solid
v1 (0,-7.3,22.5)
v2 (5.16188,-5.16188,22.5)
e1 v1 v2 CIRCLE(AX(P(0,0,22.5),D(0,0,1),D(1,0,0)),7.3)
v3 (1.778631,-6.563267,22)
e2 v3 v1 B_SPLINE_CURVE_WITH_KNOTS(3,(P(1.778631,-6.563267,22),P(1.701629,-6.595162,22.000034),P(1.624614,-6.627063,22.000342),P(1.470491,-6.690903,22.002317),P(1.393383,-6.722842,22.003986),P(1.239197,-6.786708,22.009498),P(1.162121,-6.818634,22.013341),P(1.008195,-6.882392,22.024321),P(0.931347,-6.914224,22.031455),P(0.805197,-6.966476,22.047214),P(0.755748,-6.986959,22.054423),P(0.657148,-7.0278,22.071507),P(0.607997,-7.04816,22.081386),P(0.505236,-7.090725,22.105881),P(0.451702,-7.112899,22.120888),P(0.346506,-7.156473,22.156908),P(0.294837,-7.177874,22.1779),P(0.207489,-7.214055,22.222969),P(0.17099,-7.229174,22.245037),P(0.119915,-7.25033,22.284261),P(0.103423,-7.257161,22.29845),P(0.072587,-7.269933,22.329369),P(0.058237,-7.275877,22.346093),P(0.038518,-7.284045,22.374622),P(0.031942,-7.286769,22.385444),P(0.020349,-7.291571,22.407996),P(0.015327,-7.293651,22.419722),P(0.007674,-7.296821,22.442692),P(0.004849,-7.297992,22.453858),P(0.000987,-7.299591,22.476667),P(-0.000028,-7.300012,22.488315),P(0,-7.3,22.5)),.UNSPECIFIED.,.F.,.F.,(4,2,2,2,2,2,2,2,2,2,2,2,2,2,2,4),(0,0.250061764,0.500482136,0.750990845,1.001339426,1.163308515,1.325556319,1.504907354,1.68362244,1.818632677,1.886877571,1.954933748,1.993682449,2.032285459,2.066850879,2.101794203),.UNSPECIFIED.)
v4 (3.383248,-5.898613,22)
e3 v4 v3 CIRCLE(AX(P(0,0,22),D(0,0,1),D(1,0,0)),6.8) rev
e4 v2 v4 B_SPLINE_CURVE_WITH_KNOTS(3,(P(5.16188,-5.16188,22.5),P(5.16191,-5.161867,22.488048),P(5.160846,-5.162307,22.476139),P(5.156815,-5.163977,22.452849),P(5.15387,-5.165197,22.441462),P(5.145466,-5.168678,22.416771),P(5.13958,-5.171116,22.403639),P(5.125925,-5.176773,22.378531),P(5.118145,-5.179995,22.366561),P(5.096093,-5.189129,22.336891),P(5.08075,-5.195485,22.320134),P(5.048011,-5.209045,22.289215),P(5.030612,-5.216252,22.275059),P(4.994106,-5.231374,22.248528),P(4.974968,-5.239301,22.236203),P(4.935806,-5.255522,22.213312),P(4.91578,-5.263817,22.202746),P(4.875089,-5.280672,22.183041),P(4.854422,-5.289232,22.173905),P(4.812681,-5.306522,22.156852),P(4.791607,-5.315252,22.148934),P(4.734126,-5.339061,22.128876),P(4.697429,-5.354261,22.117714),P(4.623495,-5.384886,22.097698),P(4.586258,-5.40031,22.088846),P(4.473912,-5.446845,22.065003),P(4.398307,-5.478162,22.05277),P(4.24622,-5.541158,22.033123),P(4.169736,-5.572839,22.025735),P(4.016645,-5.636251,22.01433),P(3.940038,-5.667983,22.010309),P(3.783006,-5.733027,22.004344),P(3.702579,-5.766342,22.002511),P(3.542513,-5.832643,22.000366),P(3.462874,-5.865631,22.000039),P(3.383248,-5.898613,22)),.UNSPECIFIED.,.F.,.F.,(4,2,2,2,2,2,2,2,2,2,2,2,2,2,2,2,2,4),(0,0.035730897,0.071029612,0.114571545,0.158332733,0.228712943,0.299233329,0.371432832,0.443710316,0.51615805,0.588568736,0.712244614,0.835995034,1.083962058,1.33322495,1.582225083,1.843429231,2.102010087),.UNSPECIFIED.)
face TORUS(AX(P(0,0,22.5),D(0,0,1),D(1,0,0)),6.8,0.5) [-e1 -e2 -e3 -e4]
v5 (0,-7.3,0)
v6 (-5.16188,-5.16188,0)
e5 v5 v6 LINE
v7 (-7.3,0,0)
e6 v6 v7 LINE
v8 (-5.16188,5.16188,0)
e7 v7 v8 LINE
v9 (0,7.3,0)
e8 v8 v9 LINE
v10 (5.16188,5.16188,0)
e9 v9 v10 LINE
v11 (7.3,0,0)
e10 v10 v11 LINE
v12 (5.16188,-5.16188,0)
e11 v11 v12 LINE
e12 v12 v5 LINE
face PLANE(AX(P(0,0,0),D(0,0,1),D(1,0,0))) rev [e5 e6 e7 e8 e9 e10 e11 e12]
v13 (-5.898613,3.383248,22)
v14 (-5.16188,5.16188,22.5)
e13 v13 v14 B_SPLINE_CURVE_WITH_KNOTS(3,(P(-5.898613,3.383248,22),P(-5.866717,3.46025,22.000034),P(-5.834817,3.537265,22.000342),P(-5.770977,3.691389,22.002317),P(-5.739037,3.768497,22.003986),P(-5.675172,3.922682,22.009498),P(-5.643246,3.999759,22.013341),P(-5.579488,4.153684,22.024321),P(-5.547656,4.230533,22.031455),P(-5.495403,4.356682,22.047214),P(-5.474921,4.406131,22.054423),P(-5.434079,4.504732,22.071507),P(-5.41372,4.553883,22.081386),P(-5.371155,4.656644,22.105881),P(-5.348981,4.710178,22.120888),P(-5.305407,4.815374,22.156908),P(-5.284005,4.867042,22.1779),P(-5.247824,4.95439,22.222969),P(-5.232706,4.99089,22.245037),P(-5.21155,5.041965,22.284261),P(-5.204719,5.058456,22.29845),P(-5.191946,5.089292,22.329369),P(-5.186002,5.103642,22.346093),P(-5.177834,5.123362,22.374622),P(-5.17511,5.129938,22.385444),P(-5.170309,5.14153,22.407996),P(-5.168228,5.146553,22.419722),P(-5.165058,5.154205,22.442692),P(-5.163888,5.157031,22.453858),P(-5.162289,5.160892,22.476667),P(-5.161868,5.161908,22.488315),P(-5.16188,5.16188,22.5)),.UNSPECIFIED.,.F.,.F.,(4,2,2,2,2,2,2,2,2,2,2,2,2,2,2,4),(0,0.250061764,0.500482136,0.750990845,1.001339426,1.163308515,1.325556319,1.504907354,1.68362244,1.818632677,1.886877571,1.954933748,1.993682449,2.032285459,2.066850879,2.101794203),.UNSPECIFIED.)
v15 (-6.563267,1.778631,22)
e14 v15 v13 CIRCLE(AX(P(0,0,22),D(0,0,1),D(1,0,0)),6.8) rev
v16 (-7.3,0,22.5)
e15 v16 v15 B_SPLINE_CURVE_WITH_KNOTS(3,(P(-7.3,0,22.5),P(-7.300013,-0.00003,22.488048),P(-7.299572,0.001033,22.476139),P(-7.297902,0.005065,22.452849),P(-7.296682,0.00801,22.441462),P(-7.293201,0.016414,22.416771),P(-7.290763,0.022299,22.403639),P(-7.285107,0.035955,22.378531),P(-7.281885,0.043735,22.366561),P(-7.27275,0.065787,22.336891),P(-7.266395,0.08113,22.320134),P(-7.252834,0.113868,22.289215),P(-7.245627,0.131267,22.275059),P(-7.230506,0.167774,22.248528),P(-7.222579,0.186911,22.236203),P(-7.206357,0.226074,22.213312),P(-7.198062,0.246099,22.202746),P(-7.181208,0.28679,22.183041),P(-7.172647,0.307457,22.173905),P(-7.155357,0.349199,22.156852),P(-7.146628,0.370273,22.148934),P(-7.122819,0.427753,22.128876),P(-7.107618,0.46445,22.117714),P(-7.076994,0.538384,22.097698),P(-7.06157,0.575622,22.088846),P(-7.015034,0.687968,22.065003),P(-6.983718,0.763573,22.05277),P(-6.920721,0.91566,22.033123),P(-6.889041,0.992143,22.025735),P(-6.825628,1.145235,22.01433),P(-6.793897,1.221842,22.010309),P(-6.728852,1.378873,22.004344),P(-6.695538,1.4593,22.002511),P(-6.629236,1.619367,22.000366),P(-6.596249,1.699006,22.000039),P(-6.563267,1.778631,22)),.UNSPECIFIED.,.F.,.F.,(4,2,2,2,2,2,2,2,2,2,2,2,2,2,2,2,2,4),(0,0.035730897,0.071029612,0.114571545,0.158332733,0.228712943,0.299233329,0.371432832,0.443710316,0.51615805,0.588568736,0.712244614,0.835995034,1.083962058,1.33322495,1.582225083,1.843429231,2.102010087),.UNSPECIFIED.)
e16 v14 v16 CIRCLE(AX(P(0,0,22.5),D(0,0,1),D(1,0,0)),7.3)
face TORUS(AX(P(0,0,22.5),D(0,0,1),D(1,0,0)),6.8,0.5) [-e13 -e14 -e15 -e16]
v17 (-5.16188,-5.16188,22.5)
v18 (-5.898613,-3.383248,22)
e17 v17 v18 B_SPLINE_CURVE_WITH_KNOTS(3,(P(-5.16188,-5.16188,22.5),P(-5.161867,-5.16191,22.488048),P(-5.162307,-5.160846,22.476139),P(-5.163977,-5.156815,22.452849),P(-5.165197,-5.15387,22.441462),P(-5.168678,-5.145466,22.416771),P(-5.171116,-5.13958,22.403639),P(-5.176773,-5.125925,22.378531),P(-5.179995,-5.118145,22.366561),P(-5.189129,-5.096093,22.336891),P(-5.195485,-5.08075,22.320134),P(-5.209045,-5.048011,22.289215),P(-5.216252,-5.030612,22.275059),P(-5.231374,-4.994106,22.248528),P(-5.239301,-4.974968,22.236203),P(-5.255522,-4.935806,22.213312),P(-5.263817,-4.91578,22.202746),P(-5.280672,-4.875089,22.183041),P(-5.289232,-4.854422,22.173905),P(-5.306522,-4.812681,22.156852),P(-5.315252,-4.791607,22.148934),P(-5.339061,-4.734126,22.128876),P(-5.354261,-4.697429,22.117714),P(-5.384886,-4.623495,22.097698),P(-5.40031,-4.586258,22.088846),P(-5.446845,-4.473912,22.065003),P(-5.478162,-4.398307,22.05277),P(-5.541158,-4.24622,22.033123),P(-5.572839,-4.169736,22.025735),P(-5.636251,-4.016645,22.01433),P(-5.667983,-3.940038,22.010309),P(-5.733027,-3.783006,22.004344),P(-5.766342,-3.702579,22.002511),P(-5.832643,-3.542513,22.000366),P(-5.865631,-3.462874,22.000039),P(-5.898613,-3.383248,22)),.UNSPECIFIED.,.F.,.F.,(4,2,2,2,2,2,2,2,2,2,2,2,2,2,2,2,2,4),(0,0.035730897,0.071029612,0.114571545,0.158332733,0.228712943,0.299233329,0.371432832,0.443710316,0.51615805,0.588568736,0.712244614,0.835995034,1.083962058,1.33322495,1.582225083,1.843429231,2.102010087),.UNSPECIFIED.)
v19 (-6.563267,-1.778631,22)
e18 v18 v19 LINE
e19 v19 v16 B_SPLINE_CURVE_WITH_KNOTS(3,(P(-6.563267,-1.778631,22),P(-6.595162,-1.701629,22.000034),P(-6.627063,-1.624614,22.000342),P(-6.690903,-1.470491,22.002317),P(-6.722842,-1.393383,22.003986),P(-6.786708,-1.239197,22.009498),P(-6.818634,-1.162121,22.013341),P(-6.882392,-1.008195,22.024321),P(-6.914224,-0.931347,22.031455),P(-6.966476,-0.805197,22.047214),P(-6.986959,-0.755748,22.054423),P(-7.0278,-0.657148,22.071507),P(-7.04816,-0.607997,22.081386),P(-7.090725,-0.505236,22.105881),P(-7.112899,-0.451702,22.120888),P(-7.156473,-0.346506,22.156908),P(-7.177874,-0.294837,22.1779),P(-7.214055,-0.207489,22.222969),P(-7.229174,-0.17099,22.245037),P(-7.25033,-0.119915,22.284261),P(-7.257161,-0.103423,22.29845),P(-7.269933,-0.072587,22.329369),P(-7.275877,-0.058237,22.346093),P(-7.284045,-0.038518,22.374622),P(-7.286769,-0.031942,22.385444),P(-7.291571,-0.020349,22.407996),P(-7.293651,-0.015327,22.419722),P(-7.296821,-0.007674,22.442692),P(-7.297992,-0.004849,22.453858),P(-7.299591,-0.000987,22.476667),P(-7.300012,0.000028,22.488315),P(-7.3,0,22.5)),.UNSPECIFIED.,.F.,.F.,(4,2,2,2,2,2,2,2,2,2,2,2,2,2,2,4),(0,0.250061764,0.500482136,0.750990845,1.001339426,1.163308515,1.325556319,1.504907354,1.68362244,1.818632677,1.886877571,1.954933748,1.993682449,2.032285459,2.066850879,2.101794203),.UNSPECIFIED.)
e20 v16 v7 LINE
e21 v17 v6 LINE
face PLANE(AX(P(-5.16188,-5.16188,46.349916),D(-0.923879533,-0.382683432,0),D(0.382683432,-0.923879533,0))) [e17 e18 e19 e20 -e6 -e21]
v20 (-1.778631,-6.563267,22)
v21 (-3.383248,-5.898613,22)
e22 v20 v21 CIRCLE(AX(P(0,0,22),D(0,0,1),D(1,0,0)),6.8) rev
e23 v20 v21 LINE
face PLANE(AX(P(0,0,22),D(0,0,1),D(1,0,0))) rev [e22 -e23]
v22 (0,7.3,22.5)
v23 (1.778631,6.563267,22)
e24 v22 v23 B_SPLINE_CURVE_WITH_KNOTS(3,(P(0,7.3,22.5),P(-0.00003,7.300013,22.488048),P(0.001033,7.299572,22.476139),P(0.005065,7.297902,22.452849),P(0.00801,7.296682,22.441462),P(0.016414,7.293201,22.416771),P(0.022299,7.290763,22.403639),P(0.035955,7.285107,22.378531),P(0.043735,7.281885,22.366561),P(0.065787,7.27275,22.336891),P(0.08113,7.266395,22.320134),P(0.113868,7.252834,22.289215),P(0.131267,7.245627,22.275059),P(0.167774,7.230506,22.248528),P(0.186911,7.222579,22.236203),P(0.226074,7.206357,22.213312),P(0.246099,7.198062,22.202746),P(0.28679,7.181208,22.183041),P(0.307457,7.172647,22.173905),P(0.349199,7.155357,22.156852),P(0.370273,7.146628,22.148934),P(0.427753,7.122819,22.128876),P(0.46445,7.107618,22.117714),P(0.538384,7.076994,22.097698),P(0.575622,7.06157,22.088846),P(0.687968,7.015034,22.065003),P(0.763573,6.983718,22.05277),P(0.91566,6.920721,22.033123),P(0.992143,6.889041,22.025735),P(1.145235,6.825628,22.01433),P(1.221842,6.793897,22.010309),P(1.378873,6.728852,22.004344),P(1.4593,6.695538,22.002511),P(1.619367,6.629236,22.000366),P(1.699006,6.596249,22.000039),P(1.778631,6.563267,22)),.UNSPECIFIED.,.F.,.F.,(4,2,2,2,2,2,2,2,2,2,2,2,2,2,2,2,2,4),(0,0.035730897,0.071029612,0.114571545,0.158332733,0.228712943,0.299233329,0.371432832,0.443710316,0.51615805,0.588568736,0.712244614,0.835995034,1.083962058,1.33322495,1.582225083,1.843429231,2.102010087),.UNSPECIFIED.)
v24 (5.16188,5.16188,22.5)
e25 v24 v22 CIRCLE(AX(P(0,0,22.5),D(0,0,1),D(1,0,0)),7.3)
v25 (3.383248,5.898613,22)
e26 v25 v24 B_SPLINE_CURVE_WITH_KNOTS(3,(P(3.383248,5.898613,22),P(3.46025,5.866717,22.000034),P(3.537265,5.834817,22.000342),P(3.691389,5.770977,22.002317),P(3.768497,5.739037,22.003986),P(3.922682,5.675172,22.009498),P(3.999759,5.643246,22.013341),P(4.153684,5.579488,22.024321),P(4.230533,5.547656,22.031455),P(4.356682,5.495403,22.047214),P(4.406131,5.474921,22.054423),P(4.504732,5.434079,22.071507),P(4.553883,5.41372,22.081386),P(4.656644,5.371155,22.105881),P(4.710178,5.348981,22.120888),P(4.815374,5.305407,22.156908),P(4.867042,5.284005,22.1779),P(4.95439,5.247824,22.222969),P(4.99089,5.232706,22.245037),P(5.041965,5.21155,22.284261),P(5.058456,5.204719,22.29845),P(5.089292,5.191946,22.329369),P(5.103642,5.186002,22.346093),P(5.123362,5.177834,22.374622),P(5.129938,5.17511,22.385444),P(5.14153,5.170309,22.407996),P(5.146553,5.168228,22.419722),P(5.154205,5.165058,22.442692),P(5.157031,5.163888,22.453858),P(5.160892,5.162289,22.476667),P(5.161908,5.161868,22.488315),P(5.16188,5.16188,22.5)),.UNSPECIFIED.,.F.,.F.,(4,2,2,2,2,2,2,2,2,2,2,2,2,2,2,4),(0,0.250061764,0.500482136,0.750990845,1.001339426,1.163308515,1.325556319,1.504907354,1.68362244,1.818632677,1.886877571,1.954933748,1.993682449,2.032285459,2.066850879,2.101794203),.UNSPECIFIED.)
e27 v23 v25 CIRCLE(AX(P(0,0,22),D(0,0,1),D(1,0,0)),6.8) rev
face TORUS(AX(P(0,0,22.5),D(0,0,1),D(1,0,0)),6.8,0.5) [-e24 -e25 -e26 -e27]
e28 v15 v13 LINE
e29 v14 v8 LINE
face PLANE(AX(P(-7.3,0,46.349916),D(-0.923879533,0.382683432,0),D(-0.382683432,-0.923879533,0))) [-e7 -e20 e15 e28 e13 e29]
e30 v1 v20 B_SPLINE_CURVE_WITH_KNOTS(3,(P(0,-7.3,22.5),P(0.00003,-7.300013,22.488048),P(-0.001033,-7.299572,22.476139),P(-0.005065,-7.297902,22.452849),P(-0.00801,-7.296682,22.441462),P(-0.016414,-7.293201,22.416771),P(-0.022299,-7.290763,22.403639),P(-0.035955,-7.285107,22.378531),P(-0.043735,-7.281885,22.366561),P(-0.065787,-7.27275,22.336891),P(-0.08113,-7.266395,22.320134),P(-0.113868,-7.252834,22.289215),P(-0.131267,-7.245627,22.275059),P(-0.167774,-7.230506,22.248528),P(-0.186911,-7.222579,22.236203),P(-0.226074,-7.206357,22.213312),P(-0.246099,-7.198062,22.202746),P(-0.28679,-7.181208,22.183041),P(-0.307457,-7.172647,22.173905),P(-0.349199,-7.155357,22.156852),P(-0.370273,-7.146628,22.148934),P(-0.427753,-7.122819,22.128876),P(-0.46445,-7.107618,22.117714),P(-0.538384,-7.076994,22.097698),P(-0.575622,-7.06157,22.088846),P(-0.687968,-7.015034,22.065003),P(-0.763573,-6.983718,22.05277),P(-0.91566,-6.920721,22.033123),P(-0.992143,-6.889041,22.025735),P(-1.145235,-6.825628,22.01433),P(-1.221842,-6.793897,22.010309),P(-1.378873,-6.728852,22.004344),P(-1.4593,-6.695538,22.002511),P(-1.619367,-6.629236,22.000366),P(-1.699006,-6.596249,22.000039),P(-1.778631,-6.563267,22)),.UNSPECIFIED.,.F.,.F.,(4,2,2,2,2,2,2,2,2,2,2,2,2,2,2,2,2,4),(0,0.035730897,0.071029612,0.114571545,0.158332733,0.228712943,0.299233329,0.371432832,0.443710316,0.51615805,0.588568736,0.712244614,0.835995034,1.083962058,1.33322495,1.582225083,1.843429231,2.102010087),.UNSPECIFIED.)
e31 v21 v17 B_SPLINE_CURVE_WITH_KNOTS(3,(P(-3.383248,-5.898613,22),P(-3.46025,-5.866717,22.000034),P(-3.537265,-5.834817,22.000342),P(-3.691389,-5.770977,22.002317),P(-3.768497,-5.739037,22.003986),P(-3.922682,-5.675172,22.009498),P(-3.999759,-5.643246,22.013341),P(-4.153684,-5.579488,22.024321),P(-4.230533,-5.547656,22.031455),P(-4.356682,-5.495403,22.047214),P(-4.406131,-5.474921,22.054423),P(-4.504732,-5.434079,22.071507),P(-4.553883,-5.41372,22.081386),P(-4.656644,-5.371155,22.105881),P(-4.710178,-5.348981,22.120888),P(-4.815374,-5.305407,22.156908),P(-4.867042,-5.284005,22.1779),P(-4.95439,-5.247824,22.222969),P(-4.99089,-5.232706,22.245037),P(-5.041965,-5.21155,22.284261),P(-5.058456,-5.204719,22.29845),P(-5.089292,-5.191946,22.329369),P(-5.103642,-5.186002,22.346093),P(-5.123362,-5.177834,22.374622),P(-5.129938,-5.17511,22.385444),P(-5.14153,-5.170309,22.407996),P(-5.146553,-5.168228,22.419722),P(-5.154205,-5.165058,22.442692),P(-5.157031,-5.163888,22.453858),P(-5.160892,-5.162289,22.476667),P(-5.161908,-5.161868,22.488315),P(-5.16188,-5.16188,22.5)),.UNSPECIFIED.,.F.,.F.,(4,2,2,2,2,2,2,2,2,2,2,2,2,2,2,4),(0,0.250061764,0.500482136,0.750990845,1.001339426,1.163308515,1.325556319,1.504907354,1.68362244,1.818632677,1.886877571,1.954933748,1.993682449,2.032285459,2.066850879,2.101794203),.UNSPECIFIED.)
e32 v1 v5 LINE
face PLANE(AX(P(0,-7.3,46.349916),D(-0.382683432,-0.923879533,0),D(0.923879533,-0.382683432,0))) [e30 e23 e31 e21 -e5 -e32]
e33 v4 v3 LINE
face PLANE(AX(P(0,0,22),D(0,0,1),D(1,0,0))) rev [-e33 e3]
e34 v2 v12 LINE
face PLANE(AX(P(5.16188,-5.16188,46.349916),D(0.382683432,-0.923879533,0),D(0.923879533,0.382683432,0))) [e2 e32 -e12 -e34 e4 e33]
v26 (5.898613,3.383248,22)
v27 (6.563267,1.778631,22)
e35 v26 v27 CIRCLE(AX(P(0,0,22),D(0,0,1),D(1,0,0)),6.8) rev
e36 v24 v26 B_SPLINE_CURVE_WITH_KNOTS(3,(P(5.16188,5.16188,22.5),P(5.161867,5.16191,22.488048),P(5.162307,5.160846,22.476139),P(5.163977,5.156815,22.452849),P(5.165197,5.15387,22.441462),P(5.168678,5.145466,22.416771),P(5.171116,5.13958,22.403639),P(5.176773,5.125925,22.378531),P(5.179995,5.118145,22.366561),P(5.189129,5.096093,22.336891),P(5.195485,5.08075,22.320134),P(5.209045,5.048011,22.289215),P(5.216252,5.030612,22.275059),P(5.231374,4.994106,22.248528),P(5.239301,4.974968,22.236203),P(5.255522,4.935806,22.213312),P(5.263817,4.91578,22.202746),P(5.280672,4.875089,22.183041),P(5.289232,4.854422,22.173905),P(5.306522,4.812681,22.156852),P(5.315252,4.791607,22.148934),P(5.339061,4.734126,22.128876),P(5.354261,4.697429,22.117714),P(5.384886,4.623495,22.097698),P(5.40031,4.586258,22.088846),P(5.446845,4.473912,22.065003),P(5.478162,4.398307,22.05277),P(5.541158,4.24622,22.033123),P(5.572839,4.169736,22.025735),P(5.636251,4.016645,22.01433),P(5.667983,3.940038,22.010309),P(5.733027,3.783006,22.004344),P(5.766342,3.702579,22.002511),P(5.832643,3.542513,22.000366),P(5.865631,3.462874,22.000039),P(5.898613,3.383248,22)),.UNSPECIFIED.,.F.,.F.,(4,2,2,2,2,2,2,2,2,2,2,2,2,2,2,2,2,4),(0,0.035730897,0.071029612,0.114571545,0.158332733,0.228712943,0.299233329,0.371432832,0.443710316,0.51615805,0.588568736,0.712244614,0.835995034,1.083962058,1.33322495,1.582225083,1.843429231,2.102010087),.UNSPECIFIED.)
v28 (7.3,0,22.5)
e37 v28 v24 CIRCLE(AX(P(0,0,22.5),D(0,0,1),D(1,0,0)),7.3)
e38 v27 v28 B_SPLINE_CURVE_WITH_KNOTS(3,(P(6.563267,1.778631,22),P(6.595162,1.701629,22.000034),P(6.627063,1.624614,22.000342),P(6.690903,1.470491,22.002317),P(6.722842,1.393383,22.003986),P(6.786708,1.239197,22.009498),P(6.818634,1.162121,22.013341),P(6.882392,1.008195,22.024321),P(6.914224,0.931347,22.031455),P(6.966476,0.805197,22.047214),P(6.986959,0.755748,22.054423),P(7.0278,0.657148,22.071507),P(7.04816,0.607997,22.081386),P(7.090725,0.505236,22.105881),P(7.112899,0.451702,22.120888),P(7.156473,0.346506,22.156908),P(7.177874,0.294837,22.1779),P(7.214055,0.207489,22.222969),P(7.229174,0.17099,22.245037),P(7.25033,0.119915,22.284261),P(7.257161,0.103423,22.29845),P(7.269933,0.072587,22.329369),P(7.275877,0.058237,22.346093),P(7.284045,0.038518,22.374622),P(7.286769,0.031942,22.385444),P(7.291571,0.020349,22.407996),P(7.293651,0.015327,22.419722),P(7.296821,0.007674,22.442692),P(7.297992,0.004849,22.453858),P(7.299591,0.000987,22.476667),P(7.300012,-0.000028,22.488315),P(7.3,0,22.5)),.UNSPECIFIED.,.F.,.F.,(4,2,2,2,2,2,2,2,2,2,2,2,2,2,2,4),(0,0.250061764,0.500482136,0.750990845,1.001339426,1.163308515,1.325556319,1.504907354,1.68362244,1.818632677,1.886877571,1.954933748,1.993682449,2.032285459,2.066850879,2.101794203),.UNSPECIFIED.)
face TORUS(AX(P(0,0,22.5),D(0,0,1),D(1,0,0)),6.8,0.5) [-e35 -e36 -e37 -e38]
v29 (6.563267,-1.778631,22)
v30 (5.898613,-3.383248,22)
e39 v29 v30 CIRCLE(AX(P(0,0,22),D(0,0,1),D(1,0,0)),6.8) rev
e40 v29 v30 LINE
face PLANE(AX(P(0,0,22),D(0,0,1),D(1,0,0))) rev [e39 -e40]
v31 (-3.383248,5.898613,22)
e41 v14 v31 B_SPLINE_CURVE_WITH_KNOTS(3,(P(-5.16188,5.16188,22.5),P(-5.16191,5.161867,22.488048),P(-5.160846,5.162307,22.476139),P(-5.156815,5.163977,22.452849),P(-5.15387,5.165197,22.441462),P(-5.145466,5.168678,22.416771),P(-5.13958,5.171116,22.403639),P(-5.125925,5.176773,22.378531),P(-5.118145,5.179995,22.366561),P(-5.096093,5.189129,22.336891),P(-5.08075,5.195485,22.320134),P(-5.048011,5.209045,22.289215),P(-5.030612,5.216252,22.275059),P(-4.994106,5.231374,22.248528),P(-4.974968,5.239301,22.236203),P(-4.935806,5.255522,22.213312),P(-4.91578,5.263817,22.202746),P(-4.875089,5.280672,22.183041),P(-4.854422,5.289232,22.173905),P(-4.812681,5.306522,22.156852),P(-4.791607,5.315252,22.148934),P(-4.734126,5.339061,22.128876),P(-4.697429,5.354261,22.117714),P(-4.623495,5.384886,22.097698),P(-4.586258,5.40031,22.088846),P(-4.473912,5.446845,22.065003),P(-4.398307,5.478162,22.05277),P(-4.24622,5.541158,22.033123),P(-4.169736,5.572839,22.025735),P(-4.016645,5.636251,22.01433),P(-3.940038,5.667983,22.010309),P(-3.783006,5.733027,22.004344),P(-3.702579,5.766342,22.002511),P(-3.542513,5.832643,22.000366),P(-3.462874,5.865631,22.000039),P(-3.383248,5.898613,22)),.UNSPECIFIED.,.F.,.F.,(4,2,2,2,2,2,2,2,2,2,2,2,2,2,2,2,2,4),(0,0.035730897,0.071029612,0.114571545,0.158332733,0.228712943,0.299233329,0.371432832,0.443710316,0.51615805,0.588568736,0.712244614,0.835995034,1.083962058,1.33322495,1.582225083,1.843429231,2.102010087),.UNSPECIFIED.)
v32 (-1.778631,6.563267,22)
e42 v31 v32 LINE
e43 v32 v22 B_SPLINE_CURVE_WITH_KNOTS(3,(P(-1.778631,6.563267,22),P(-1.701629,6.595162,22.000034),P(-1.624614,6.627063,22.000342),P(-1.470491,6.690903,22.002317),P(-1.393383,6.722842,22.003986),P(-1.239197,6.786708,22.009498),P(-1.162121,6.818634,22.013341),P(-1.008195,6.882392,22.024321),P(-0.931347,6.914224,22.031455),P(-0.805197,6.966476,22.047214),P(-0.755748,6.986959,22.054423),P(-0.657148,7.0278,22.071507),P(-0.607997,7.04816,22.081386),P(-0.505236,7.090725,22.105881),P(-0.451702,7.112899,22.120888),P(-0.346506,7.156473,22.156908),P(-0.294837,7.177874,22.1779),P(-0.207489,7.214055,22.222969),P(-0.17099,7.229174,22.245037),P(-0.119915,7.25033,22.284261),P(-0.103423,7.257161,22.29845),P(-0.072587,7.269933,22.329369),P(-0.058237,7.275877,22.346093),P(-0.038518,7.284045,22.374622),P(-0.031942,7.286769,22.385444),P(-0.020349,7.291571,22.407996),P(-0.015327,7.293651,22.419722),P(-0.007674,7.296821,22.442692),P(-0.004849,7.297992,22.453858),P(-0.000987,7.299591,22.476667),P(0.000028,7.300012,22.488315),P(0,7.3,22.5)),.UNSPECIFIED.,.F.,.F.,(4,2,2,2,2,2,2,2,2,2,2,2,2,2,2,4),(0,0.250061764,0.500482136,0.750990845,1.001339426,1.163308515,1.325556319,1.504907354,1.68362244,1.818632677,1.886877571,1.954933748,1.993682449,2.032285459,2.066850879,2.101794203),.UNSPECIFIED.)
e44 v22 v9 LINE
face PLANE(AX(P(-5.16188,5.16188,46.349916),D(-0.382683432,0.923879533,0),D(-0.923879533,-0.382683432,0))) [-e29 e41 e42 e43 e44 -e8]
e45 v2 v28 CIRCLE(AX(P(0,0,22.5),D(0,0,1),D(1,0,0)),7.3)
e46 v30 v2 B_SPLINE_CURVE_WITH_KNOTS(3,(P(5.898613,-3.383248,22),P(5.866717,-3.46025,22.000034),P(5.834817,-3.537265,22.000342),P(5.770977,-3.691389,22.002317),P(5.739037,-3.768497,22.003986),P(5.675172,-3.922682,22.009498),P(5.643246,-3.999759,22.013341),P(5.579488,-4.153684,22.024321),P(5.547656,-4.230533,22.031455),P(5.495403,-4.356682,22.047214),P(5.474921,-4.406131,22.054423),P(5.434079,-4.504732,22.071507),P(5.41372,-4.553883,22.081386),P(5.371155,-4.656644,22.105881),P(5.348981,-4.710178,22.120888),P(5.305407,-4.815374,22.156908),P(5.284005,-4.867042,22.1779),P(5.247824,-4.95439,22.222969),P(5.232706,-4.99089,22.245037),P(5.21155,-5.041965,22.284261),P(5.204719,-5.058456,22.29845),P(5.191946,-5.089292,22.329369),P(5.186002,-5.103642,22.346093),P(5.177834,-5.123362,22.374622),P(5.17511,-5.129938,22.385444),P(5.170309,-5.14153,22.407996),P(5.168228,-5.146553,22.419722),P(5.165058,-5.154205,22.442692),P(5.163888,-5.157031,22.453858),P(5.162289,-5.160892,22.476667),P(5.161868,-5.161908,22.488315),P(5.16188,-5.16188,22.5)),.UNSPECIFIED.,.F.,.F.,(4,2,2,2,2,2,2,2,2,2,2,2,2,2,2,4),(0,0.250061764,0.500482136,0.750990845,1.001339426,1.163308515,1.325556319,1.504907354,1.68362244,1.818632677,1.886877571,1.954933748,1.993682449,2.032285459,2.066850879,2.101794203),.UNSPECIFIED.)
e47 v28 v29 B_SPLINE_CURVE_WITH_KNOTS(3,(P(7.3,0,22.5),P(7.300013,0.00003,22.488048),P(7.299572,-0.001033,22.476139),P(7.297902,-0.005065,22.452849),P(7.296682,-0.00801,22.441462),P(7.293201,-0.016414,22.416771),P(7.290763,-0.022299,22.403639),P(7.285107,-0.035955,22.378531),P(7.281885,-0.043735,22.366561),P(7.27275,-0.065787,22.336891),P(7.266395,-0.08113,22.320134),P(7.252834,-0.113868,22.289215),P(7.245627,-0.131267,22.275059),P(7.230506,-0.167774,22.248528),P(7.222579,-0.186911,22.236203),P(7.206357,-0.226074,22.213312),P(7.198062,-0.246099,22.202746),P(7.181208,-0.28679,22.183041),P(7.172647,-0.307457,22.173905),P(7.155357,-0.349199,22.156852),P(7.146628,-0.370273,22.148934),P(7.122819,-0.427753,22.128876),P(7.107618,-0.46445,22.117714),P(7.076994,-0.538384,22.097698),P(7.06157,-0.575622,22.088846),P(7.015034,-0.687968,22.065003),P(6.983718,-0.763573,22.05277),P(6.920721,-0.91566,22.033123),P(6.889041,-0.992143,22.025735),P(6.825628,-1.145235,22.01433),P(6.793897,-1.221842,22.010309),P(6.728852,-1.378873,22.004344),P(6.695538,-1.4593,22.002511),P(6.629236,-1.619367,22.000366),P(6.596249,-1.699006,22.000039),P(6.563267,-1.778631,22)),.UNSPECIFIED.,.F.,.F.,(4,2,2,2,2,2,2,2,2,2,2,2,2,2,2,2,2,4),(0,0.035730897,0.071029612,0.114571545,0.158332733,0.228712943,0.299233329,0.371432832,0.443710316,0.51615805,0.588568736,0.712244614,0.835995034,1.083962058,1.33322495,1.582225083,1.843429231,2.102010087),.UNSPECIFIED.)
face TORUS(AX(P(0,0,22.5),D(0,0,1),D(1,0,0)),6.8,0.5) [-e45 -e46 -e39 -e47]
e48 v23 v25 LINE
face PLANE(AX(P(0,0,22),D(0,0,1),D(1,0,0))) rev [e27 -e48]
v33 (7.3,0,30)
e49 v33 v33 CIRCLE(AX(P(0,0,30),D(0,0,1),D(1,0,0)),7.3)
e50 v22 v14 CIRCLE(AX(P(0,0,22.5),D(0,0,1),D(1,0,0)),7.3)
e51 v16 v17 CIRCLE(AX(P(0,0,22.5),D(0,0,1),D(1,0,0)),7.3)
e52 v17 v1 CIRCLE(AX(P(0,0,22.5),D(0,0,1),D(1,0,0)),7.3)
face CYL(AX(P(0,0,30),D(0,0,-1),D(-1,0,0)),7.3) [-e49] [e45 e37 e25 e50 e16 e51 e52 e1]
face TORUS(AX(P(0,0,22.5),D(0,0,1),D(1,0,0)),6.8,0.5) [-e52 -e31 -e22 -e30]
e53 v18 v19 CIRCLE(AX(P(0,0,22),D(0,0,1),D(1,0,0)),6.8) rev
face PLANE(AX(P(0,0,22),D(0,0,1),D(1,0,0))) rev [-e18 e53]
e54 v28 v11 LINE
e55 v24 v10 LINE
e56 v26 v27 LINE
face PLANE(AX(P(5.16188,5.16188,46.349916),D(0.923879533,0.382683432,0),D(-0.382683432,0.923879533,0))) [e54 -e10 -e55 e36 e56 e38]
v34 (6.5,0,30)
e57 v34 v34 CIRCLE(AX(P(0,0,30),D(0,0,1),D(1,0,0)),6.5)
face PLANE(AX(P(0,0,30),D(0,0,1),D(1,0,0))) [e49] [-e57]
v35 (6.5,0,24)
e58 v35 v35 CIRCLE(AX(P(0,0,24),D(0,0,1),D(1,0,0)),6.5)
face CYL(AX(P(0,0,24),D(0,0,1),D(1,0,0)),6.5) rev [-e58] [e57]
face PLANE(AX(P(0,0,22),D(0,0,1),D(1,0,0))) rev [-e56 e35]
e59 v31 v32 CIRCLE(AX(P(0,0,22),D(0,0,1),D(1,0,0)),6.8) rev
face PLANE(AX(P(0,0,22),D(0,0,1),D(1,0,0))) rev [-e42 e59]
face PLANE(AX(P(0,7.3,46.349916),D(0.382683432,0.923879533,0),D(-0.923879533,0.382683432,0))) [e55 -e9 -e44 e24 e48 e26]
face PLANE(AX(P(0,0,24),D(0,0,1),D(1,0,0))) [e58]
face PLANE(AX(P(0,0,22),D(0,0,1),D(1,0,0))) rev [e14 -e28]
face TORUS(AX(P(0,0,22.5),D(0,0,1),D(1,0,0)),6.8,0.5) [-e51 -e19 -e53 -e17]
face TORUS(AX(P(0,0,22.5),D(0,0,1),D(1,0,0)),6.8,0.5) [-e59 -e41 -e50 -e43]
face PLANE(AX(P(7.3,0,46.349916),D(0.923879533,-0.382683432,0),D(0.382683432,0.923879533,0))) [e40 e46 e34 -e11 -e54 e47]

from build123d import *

# Parameters (mm, degrees)
SKETCH1_R           = 7.3
BOSS_EXTRUDE1_DEPTH = 30
SKETCH2_R           = 6.5
CUT_EXTRUDE1_DEPTH  = 6
SKETCH3_OUTSIDE_W   = 23.884
SKETCH3_OUTSIDE_H   = 23.884
CUT_EXTRUDE3_DEPTH  = 22
FILLET2_R           = 0.5


with BuildPart() as part:
    # Sketch1 → Boss-Extrude1 (new body)
    with BuildSketch(Plane.XY):
        Circle(SKETCH1_R)
    extrude(amount=BOSS_EXTRUDE1_DEPTH)

    # Sketch2 → Cut-Extrude1 (cut)
    with BuildSketch(Plane.XY.offset(30)):
        Circle(SKETCH2_R)
    extrude(amount=-CUT_EXTRUDE1_DEPTH, mode=Mode.SUBTRACT)

    # Sketch3 outside → Cut-Extrude3 (cut)
    with BuildSketch(Plane(origin=(0, 0, 0), x_dir=(-1, 0, 0), z_dir=(0, 0, -1))):
        Rectangle(SKETCH3_OUTSIDE_W, SKETCH3_OUTSIDE_H)
        Polygon((7.3, 0), (5.161879503, 5.161879503), (0, 7.3), (-5.161879503, 5.161879503), (-7.3, 0), (-5.161879503, -5.161879503), (0, -7.3), (5.161879503, -5.161879503), align=None, mode=Mode.SUBTRACT)
    extrude(amount=-CUT_EXTRUDE3_DEPTH, mode=Mode.SUBTRACT)

    # Fillet2
    # the kernel refuses this fillet: 0.5 mm, written as the material it takes off along each edge
    with BuildSketch(Plane(origin=(0, 0, 22), x_dir=(1, 0, 0), z_dir=(0, 1, 0))) as fillet2_piece_1_section:
        with BuildLine():
            CenterArc((7.3 - FILLET2_R, -FILLET2_R), FILLET2_R, 0, 90)
            Line((7.3, -FILLET2_R), (7.3, 0))
            Line((7.3, 0), (7.3 - FILLET2_R, 0))
        make_face()
    fillet2_piece_1 = revolve(axis=Axis((0, 0, 22), (0, 0, -1)), revolution_arc=45, mode=Mode.PRIVATE)
    fillet2_piece_1 = split(fillet2_piece_1, bisect_by=Plane(origin=(6.230939751, -2.580939751, 22.141608604), z_dir=(0.9238795325112824, -0.3826834323651005, 0)), keep=Keep.TOP, mode=Mode.PRIVATE)
    add(fillet2_piece_1, mode=Mode.SUBTRACT)
    with BuildSketch(Plane(origin=(0, 0, 22), x_dir=(0.7071067811865394, -0.7071067811865557, 0), z_dir=(0.7071067811865557, 0.7071067811865394, 0))) as fillet2_piece_2_section:
        with BuildLine():
            CenterArc((7.3 - FILLET2_R, -FILLET2_R), FILLET2_R, 0, 90)
            Line((7.3 - FILLET2_R, 0), (7.3, 0))
            Line((7.3, 0), (7.3, -FILLET2_R))
        make_face()
    fillet2_piece_2 = revolve(axis=Axis((0, 0, 22), (0, 0, -1)), revolution_arc=45, mode=Mode.PRIVATE)
    fillet2_piece_2 = split(fillet2_piece_2, bisect_by=Plane(origin=(2.580939751, -6.230939751, 22.141608605), z_dir=(0.3826834323650794, -0.9238795325112911, 0)), keep=Keep.TOP, mode=Mode.PRIVATE)
    add(fillet2_piece_2, mode=Mode.SUBTRACT)
    with BuildSketch(Plane(origin=(0, 0, 22), x_dir=(0, -1, 0), z_dir=(1, 0, 0))) as fillet2_piece_3_section:
        with BuildLine():
            CenterArc((7.3 - FILLET2_R, -FILLET2_R), FILLET2_R, 0, 90)
            Line((7.3 - FILLET2_R, 0), (7.3, 0))
            Line((7.3, 0), (7.3, -FILLET2_R))
        make_face()
    fillet2_piece_3 = revolve(axis=Axis((0, 0, 22), (0, 0, -1)), revolution_arc=45, mode=Mode.PRIVATE)
    fillet2_piece_3 = split(fillet2_piece_3, bisect_by=Plane(origin=(-2.580939751, -6.230939751, 22.141608604), z_dir=(-0.38268343236510044, -0.9238795325112824, 0)), keep=Keep.TOP, mode=Mode.PRIVATE)
    add(fillet2_piece_3, mode=Mode.SUBTRACT)
    with BuildSketch(Plane(origin=(0, 0, 22), x_dir=(-0.7071067811865553, -0.7071067811865397, 0), z_dir=(0.7071067811865397, -0.7071067811865553, 0))) as fillet2_piece_4_section:
        with BuildLine():
            CenterArc((7.3 - FILLET2_R, -FILLET2_R), FILLET2_R, 0, 90)
            Line((7.3 - FILLET2_R, 0), (7.3, 0))
            Line((7.3, 0), (7.3, -FILLET2_R))
        make_face()
    fillet2_piece_4 = revolve(axis=Axis((0, 0, 22), (0, 0, -1)), revolution_arc=45, mode=Mode.PRIVATE)
    fillet2_piece_4 = split(fillet2_piece_4, bisect_by=Plane(origin=(-6.230939751, -2.580939751, 22.141608603), z_dir=(-0.9238795325112912, -0.3826834323650791, 0)), keep=Keep.TOP, mode=Mode.PRIVATE)
    add(fillet2_piece_4, mode=Mode.SUBTRACT)
    with BuildSketch(Plane(origin=(0, 0, 22), x_dir=(-1, 0, 0), z_dir=(0, -1, 0))) as fillet2_piece_5_section:
        with BuildLine():
            CenterArc((7.3 - FILLET2_R, -FILLET2_R), FILLET2_R, 0, 90)
            Line((7.3 - FILLET2_R, 0), (7.3, 0))
            Line((7.3, 0), (7.3, -FILLET2_R))
        make_face()
    fillet2_piece_5 = revolve(axis=Axis((0, 0, 22), (0, 0, -1)), revolution_arc=45, mode=Mode.PRIVATE)
    fillet2_piece_5 = split(fillet2_piece_5, bisect_by=Plane(origin=(-6.230939751, 2.580939751, 22.141608604), z_dir=(-0.9238795325112823, 0.38268343236510055, 0)), keep=Keep.TOP, mode=Mode.PRIVATE)
    add(fillet2_piece_5, mode=Mode.SUBTRACT)
    with BuildSketch(Plane(origin=(0, 0, 22), x_dir=(-0.7071067811865395, 0.7071067811865556, 0), z_dir=(-0.7071067811865556, -0.7071067811865395, 0))) as fillet2_piece_6_section:
        with BuildLine():
            CenterArc((7.3 - FILLET2_R, -FILLET2_R), FILLET2_R, 0, 90)
            Line((7.3 - FILLET2_R, 0), (7.3, 0))
            Line((7.3, 0), (7.3, -FILLET2_R))
        make_face()
    fillet2_piece_6 = revolve(axis=Axis((0, 0, 22), (0, 0, -1)), revolution_arc=45, mode=Mode.PRIVATE)
    fillet2_piece_6 = split(fillet2_piece_6, bisect_by=Plane(origin=(-2.580939751, 6.230939751, 22.141608604), z_dir=(-0.3826834323650789, 0.9238795325112913, 0)), keep=Keep.TOP, mode=Mode.PRIVATE)
    add(fillet2_piece_6, mode=Mode.SUBTRACT)
    with BuildSketch(Plane(origin=(0, 0, 22), x_dir=(0, 1, 0), z_dir=(-1, 0, 0))) as fillet2_piece_7_section:
        with BuildLine():
            CenterArc((7.3 - FILLET2_R, -FILLET2_R), FILLET2_R, 0, 90)
            Line((7.3, -FILLET2_R), (7.3, 0))
            Line((7.3, 0), (7.3 - FILLET2_R, 0))
        make_face()
    fillet2_piece_7 = revolve(axis=Axis((0, 0, 22), (0, 0, -1)), revolution_arc=45, mode=Mode.PRIVATE)
    fillet2_piece_7 = split(fillet2_piece_7, bisect_by=Plane(origin=(2.580939751, 6.230939751, 22.141608604), z_dir=(0.38268343236510044, 0.9238795325112824, 0)), keep=Keep.TOP, mode=Mode.PRIVATE)
    add(fillet2_piece_7, mode=Mode.SUBTRACT)
    with BuildSketch(Plane(origin=(0, 0, 22), x_dir=(0.7071067811865556, 0.7071067811865395, 0), z_dir=(-0.7071067811865395, 0.7071067811865556, 0))) as fillet2_piece_8_section:
        with BuildLine():
            CenterArc((7.3 - FILLET2_R, -FILLET2_R), FILLET2_R, 0, 90)
            Line((7.3, -FILLET2_R), (7.3, 0))
            Line((7.3, 0), (7.3 - FILLET2_R, 0))
        make_face()
    fillet2_piece_8 = revolve(axis=Axis((0, 0, 22), (0, 0, -1)), revolution_arc=45, mode=Mode.PRIVATE)
    fillet2_piece_8 = split(fillet2_piece_8, bisect_by=Plane(origin=(6.230939751, 2.580939751, 22.141608603), z_dir=(0.9238795325112913, 0.38268343236507885, 0)), keep=Keep.TOP, mode=Mode.PRIVATE)
    add(fillet2_piece_8, mode=Mode.SUBTRACT)


solid = part.part
